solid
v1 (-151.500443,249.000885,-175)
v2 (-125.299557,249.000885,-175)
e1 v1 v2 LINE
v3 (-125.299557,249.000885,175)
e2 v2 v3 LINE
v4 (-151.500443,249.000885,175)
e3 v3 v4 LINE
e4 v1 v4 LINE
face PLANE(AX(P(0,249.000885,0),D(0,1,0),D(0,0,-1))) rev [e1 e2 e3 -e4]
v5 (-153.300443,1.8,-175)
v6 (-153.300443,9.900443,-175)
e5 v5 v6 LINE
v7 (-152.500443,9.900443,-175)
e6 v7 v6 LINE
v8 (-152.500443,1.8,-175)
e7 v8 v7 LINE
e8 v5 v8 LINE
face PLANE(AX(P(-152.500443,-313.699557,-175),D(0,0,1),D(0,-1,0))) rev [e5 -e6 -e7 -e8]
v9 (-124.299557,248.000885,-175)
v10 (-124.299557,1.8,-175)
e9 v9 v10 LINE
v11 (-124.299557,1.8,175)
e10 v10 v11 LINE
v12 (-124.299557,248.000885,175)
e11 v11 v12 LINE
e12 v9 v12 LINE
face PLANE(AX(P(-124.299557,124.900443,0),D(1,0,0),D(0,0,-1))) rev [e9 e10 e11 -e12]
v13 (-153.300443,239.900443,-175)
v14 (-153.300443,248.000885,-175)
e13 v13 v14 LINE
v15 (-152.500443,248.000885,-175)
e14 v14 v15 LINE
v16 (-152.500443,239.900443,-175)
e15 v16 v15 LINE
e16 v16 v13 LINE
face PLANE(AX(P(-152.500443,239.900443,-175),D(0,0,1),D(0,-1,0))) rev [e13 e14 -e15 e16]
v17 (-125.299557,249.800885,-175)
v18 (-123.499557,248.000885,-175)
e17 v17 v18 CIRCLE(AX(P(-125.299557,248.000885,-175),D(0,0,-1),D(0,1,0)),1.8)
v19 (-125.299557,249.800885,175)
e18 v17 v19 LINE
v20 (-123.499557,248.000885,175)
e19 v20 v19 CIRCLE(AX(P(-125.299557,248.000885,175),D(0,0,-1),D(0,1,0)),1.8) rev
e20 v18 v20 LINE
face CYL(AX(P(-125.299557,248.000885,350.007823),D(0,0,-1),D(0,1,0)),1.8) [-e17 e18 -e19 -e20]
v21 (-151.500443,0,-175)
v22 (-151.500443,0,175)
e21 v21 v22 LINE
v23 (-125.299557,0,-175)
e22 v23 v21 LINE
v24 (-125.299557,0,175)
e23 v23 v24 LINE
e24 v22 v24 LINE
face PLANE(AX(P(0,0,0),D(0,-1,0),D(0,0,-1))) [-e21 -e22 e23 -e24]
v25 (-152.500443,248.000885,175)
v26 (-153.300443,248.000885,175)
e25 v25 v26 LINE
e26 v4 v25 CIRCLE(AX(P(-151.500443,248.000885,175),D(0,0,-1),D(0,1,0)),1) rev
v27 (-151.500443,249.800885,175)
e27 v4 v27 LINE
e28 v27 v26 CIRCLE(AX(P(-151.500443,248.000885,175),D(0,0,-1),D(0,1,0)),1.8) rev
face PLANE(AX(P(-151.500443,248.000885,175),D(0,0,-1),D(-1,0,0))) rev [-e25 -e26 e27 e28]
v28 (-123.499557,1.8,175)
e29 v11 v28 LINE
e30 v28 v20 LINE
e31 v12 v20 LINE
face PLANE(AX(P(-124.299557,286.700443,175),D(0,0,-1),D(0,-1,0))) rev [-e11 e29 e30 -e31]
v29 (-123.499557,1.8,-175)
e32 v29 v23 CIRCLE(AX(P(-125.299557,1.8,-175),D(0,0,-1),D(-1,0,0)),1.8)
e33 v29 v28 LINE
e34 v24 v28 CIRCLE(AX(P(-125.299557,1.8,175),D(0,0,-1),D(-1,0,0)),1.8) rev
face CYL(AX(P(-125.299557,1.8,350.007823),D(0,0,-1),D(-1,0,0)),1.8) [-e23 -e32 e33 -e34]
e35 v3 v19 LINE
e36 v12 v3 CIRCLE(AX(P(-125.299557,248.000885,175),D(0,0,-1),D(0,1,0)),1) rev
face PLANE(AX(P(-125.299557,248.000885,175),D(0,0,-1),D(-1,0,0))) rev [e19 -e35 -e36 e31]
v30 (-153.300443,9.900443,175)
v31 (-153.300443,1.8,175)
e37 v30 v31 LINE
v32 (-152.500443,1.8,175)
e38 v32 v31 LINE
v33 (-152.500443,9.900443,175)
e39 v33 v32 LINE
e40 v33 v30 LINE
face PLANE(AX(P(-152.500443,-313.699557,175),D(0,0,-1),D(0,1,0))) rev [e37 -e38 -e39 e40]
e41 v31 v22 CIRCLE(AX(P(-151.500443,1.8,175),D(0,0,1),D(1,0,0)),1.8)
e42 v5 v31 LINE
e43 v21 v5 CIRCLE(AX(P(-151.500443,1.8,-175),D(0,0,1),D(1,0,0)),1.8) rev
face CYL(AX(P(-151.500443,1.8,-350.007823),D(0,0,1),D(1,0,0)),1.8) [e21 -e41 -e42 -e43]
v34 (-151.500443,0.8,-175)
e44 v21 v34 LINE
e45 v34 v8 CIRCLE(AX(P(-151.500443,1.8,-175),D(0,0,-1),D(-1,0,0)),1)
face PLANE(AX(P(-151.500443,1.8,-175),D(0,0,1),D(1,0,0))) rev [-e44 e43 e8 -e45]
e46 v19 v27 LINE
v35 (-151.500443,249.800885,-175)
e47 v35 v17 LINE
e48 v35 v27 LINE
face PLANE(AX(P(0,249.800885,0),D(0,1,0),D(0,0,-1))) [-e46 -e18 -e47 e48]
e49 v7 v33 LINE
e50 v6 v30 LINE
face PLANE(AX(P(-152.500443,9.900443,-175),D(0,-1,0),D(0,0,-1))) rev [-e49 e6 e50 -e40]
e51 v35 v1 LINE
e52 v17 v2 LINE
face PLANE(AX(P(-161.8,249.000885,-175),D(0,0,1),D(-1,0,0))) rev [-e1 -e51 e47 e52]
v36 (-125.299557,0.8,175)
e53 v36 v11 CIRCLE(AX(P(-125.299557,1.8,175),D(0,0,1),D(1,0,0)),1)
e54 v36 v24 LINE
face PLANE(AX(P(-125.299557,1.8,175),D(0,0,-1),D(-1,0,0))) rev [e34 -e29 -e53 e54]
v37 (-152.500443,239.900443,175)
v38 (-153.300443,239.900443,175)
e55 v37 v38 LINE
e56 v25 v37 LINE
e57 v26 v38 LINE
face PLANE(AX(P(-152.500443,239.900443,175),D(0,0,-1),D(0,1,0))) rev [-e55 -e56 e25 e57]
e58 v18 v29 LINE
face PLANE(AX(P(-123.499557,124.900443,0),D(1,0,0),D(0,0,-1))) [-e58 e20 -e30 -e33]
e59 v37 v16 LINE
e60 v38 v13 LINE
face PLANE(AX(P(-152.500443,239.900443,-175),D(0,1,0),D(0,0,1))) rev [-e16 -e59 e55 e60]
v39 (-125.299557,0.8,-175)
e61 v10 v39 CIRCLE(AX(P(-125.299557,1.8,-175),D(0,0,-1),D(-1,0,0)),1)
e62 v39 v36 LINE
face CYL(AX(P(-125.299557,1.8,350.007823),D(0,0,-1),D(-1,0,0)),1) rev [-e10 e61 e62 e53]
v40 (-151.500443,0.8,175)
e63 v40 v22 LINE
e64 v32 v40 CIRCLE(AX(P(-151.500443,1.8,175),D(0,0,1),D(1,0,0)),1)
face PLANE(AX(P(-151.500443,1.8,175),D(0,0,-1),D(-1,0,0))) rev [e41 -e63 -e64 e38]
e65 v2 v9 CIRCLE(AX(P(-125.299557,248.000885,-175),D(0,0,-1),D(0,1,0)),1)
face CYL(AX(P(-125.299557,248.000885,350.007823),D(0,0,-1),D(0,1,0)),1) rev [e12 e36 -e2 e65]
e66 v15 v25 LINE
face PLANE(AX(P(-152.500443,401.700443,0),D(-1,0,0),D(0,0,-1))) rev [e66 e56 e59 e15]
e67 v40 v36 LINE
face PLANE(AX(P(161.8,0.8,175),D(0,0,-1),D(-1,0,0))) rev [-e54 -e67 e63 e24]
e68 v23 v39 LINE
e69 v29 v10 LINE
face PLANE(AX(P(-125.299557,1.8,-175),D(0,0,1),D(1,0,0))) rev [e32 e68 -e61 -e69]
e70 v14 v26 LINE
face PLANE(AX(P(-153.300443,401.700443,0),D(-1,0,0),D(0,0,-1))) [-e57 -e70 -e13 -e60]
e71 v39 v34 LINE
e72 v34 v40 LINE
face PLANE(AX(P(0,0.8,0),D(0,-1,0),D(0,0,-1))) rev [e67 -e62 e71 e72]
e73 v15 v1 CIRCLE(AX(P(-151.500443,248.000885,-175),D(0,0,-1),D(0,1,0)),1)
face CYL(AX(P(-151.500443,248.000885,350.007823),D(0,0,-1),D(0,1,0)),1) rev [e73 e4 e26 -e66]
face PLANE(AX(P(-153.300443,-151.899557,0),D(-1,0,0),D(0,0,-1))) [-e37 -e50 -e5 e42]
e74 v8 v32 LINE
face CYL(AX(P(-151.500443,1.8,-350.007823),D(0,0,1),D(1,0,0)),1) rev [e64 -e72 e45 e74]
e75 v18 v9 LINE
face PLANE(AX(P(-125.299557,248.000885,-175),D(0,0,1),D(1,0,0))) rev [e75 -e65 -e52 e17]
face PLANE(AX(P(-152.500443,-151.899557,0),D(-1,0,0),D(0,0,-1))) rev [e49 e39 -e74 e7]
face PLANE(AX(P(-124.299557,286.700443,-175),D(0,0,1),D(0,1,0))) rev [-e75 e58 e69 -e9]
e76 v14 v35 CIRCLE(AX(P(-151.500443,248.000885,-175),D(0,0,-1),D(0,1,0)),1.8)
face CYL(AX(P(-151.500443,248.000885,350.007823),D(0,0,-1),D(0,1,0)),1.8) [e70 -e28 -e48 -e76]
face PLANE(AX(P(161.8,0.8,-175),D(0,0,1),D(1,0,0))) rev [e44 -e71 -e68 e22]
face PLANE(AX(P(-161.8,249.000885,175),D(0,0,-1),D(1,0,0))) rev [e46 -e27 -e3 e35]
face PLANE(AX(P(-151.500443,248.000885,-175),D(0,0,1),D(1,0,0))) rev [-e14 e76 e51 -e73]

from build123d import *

# Parameters (mm, degrees)
SKETCH1_W              = 323.6
SKETCH1_H              = 350
BASE_FLANGE1_DEPTH     = 0.8
SKETCHED_START         = -175
SKETCHED_BEND3_DEPTH   = 350
SKETCHED_BEND3_2_DEPTH = 350


# Read off the part's stored shape, not the designer's step: Sketched Bend3
# Sheet-metal steps are written as plain solids
with BuildPart() as part:
    # Sketch1 → Base-Flange1 (new body)
    with BuildSketch(Plane(origin=(0, 0, 0), x_dir=(1, 0, 0), z_dir=(0, 1, 0))):
        Rectangle(SKETCH1_W, SKETCH1_H)
    extrude(amount=BASE_FLANGE1_DEPTH)

    # Sketched Bend3 outline → Sketched Bend3 (cut)
    with BuildSketch(Plane.XY.offset(SKETCHED_START)):
        with BuildLine():
            Line((161.8, 0.8), (-123.802894475, 0.8))
            ThreePointArc((-123.802894475, 0.8), (-124.451029292, 0.212549213), (-125.299557429, 0))
            Line((-125.299557429, 0), (161.8, 0))
            Line((161.8, 0), (161.8, 0.8))
        make_face()
        with BuildLine():
            Line((-161.8, 0), (-151.500442571, 0))
            ThreePointArc((-151.500442571, 0), (-152.348970708, 0.212549213), (-152.997105525, 0.8))
            Line((-152.997105525, 0.8), (-161.8, 0.8))
            Line((-161.8, 0.8), (-161.8, 0))
        make_face()
    extrude(amount=SKETCHED_BEND3_DEPTH, mode=Mode.SUBTRACT)

    # Sketched Bend3 2 outline → Sketched Bend3 2 (add)
    with BuildSketch(Plane.XY.offset(SKETCHED_START)):
        with BuildLine():
            ThreePointArc((-123.802894475, 0.8), (-123.577060213, 1.277502784), (-123.499557429, 1.8))
            Line((-123.499557429, 1.8), (-123.499557429, 248.000885142))
            ThreePointArc((-123.499557429, 248.000885142), (-124.026765223, 249.273677349), (-125.299557429, 249.800885142))
            Line((-125.299557429, 249.800885142), (-151.500442571, 249.800885142))
            ThreePointArc((-151.500442571, 249.800885142), (-152.773234777, 249.273677348), (-153.300442571, 248.000885142))
            Line((-153.300442571, 248.000885142), (-153.300442571, 239.900442571))
            Line((-153.300442571, 239.900442571), (-152.500442571, 239.900442571))
            Line((-152.500442571, 239.900442571), (-152.500442571, 248.000885142))
            ThreePointArc((-152.500442571, 248.000885142), (-152.207549352, 248.707991924), (-151.500442571, 249.000885142))
            Line((-151.500442571, 249.000885142), (-125.299557429, 249.000885142))
            ThreePointArc((-125.299557429, 249.000885142), (-124.592450648, 248.707991924), (-124.299557429, 248.000885142))
            Line((-124.299557429, 248.000885142), (-124.299557429, 1.8))
            ThreePointArc((-124.299557429, 1.8), (-124.592450648, 1.092893219), (-125.299557429, 0.8))
            Line((-125.299557429, 0.8), (-123.802894475, 0.8))
        make_face()
        with BuildLine():
            Line((-152.997105525, 0.8), (-151.500442571, 0.8))
            ThreePointArc((-151.500442571, 0.8), (-152.207549352, 1.092893219), (-152.500442571, 1.8))
            Line((-152.500442571, 1.8), (-152.500442571, 9.900442571))
            Line((-152.500442571, 9.900442571), (-153.300442571, 9.900442571))
            Line((-153.300442571, 9.900442571), (-153.300442571, 1.8))
            ThreePointArc((-153.300442571, 1.8), (-153.222939787, 1.277502784), (-152.997105525, 0.8))
        make_face()
    extrude(amount=SKETCHED_BEND3_2_DEPTH)


solid = part.part
